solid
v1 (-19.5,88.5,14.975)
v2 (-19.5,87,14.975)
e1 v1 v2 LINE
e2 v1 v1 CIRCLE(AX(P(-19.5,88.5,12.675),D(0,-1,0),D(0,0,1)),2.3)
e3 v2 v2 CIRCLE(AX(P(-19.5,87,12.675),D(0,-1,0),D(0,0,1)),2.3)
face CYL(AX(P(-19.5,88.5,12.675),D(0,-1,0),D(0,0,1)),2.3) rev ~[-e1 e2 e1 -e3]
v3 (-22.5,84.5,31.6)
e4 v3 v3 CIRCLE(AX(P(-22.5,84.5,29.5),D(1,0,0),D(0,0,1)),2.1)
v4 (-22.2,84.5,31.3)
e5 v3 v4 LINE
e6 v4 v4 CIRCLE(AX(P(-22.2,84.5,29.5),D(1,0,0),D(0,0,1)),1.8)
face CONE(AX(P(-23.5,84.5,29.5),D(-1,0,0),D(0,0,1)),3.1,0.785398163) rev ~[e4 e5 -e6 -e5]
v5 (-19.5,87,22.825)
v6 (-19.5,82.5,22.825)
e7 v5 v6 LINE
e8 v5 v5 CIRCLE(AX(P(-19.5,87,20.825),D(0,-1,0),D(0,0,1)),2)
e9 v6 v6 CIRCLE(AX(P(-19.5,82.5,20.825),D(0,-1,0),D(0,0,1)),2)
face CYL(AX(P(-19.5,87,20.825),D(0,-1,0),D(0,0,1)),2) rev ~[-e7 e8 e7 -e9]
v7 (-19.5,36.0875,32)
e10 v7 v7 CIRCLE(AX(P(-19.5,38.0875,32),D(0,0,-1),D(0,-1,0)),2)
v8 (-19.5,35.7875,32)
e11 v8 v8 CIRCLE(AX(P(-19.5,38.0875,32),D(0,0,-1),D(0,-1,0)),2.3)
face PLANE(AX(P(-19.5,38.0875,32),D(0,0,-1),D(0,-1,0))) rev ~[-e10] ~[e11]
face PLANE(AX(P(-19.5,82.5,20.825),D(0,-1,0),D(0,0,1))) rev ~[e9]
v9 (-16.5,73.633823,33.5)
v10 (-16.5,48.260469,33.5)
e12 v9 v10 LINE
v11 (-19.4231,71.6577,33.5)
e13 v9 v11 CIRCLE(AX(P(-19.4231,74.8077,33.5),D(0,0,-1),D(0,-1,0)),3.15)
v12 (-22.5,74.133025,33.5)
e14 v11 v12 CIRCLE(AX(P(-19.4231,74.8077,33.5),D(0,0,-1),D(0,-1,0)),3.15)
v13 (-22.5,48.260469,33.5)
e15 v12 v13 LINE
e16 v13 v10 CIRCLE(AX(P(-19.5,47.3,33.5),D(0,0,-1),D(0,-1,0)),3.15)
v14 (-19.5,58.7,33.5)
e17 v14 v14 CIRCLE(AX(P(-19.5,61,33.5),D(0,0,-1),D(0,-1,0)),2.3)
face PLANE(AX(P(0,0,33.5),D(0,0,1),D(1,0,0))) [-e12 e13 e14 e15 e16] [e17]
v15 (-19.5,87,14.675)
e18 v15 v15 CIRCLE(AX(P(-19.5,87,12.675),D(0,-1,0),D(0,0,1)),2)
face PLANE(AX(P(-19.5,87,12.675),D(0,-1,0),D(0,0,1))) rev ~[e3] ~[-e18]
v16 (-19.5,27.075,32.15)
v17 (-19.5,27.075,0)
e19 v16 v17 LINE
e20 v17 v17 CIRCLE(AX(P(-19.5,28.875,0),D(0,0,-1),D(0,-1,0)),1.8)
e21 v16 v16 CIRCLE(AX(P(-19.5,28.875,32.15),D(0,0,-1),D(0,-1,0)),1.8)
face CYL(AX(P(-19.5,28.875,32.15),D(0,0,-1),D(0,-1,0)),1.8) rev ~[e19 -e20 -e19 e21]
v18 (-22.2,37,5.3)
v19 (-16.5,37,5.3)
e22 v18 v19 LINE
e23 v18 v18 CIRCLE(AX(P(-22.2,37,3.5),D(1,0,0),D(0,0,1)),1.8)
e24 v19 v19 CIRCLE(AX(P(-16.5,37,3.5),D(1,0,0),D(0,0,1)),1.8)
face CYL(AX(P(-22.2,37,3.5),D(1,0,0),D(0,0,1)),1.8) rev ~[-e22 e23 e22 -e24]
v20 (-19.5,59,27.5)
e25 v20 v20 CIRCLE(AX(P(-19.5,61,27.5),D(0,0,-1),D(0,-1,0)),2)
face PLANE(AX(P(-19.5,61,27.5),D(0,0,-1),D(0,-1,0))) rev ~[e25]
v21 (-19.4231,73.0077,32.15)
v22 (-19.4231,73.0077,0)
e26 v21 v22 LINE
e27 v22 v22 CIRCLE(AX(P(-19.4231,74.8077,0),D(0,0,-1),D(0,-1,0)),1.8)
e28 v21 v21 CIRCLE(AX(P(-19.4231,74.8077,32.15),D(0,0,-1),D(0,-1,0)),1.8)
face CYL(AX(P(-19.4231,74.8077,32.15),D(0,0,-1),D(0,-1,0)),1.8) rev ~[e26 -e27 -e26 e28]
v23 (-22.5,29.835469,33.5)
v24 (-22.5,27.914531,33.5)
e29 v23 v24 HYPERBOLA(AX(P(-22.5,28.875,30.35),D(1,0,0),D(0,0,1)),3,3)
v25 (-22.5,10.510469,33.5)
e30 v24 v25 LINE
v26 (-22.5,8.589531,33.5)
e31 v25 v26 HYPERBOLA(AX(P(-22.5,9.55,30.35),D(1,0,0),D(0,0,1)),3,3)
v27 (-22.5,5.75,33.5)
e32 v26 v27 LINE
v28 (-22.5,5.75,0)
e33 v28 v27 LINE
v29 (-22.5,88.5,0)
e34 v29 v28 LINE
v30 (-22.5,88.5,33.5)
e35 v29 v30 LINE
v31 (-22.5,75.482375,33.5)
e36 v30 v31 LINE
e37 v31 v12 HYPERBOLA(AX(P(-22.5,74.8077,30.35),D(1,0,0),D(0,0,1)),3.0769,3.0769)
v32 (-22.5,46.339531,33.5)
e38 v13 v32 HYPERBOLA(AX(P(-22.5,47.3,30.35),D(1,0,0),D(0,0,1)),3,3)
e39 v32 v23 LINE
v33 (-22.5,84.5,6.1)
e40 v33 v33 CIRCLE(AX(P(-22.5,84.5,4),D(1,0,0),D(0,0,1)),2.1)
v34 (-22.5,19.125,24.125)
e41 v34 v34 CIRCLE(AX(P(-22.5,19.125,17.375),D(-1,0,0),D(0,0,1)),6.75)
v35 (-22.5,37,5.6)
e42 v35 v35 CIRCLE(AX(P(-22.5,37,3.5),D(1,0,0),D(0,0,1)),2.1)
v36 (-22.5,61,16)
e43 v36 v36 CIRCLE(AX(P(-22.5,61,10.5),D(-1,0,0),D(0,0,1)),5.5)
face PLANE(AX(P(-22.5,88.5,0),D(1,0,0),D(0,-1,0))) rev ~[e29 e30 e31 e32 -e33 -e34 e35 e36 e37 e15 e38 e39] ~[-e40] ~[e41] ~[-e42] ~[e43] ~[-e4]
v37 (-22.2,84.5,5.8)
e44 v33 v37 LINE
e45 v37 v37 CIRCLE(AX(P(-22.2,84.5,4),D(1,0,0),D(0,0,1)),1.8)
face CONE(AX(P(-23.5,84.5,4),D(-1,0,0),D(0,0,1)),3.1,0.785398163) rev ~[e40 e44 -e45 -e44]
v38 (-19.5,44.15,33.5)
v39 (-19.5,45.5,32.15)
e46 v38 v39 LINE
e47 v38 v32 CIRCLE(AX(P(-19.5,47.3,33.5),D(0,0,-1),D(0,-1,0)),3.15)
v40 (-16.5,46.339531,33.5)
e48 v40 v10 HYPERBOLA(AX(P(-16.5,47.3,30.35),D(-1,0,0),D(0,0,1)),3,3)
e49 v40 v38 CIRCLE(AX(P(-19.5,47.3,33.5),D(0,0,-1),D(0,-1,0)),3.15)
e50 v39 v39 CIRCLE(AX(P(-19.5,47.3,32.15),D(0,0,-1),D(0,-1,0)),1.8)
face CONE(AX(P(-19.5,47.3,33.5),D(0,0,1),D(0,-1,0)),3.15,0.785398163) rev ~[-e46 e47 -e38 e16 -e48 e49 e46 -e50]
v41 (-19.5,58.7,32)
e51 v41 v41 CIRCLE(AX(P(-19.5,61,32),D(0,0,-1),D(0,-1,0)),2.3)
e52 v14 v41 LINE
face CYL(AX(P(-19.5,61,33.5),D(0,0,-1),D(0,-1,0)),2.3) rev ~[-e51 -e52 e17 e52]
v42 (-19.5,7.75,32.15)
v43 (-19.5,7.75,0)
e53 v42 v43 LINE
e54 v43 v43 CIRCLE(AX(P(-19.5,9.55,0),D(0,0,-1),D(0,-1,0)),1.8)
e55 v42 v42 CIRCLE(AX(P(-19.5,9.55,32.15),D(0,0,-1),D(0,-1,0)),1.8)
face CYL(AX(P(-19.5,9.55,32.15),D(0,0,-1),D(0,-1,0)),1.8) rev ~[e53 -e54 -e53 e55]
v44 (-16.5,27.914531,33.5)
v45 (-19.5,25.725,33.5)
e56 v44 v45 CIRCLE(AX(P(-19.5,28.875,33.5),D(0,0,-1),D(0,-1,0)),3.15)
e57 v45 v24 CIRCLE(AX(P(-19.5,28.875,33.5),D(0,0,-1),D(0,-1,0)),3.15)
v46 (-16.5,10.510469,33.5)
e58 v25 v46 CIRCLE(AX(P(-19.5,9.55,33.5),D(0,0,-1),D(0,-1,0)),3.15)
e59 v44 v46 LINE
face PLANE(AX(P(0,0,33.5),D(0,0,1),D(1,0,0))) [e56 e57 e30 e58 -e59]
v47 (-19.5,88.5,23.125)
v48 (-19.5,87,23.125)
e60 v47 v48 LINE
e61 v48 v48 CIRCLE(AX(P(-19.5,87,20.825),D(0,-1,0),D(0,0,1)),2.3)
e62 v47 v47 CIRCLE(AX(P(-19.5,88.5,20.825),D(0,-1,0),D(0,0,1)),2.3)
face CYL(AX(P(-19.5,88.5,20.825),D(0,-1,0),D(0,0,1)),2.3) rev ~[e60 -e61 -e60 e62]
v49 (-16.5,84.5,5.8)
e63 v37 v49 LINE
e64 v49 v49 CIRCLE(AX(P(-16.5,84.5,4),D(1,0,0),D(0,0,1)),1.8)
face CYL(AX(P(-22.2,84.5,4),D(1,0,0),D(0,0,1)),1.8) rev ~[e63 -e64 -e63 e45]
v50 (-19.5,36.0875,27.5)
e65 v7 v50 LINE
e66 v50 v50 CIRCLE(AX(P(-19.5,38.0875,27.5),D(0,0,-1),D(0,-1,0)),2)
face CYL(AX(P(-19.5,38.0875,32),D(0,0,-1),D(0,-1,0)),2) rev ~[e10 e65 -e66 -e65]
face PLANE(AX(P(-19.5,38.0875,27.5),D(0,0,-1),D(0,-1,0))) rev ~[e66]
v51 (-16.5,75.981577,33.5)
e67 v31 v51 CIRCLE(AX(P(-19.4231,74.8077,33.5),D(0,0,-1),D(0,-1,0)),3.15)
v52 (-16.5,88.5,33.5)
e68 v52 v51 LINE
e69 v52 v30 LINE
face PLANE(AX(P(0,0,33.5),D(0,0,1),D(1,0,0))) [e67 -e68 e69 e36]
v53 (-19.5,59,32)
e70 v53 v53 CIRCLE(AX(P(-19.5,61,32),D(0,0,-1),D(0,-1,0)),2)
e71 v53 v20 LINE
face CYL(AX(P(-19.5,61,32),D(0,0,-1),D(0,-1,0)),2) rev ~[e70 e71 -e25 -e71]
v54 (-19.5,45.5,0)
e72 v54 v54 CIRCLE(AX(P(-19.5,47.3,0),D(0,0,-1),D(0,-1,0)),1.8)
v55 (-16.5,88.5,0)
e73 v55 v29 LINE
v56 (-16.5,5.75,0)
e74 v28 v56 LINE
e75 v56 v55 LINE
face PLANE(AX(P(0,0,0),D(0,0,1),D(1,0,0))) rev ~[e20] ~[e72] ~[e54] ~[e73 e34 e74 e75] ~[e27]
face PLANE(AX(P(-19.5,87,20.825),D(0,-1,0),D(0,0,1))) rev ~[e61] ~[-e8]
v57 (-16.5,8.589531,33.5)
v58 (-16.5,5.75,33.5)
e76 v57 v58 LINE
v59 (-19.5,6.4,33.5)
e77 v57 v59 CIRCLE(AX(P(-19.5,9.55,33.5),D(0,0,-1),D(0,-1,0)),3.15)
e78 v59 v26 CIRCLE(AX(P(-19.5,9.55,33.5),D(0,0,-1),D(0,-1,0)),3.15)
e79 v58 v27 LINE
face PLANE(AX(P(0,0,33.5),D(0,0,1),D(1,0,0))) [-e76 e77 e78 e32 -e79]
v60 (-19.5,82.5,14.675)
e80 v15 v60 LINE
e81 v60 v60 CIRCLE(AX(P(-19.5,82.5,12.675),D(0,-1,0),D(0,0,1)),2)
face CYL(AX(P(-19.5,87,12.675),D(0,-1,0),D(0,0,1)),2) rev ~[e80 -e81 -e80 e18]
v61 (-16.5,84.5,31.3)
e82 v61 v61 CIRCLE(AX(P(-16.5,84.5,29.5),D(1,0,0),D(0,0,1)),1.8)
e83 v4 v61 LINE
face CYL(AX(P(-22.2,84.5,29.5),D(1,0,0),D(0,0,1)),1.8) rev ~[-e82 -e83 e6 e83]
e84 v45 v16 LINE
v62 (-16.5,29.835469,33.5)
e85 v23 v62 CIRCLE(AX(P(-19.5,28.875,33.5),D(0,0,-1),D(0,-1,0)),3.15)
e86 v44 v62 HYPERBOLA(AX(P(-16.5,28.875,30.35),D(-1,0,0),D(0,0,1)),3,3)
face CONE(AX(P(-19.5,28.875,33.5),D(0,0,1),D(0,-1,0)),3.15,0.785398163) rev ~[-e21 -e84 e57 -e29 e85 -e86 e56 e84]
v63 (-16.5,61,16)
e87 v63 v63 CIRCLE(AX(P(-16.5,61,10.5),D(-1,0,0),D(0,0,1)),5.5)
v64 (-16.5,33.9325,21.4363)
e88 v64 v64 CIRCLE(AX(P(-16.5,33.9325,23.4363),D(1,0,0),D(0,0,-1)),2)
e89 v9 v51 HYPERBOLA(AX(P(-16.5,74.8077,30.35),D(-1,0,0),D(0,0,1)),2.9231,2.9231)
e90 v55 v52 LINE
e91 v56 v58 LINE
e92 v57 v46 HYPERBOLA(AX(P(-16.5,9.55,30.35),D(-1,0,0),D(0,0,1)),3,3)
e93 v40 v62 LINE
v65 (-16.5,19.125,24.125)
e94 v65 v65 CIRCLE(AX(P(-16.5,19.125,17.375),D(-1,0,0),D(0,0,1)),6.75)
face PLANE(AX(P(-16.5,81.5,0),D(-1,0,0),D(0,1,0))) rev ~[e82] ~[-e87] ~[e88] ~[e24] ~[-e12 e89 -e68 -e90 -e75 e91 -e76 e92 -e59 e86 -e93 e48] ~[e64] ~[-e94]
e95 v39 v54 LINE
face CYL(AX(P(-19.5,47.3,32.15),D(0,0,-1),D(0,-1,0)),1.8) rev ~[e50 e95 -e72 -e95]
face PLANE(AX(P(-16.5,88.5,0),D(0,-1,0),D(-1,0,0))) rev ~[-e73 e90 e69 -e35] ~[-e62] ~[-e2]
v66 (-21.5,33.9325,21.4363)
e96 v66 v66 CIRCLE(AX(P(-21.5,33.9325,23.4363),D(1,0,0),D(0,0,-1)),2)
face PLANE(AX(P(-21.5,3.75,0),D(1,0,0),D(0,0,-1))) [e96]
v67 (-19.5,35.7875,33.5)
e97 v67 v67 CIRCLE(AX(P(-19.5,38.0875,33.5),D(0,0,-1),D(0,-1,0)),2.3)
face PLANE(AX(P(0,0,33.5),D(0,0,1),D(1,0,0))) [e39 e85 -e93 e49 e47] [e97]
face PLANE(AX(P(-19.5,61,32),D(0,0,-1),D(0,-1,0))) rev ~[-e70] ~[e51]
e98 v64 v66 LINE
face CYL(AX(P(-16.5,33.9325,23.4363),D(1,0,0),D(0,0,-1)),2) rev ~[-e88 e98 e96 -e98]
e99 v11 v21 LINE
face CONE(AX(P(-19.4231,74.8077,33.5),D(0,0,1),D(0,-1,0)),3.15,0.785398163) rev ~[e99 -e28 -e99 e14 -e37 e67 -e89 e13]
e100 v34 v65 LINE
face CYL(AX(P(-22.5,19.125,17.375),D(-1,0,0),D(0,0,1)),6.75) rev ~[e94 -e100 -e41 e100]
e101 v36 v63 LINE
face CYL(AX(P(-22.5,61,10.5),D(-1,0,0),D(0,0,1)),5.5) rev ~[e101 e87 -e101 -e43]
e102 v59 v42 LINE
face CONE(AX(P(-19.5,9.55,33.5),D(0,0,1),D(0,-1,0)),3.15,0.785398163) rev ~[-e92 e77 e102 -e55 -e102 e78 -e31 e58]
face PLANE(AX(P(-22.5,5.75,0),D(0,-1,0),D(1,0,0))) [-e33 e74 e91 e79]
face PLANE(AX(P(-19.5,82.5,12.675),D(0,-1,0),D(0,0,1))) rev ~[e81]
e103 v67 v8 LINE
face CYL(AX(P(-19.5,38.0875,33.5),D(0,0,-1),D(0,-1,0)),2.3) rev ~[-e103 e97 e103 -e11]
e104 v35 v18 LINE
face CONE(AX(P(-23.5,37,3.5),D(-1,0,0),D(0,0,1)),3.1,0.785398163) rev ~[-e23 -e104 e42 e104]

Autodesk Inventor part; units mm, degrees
ref_plane "YZ Plane" through (0, 0, 0) normal (1, 0, 0) x (0, 1, 0)
ref_plane "XZ Plane" through (0, 0, 0) normal (0, 1, 0) x (-1, 0, 0)
ref_plane "Work Plane1" through (0, 0, 0) normal (0, 0, 1) x (1, 0, 0)
sketch "Sketch1" plane through (0, 0, 0) normal (0, 0, 1) x (1, 0, 0)
  line L0 (23.5, 88.5) -> (-23.5, 88.5) projected
  line L1 (-23.5, 88.5) -> (-23.5, 36.5) projected
  line L2 (-26.5, 33.5) -> (-89, 33.5) projected
  line L3 (-89, 33.5) -> (-89, -72.5) projected
  line L4 (-89, -72.5) -> (-77, -72.5) projected
  line L5 (-74, -75.5) -> (-74, -93.5) projected
  line L6 (-74, -93.5) -> (74, -93.5) projected
  line L7 (74, -93.5) -> (74, -75.5) projected
  line L8 (77, -72.5) -> (89, -72.5) projected
  line L9 (89, -72.5) -> (89, 33.5) projected
  line L10 (89, 33.5) -> (26.5, 33.5) projected
  line L11 (23.5, 36.5) -> (23.5, 88.5) projected
  line L12 (-4.5, 81.5) -> (-4.5, 36.5) projected
  line L13 (-7.5, 33.5) -> (-13.5, 33.5) projected
  line L14 (-16.5, 36.5) -> (-16.5, 81.5) projected
  line L15 (7.5, 84.5) -> (13.5, 84.5) projected
  line L16 (16.5, 81.5) -> (16.5, 36.5) projected
  line L17 (13.5, 33.5) -> (7.5, 33.5) projected
  line L18 (4.5, 36.5) -> (4.5, 81.5) projected
  line L19 (-13.5, 84.5) -> (-7.5, 84.5) projected
  line L20 (-16.5, 88.5) -> (-22.5, 88.5)
  line L21 (-22.5, 88.5) -> (-22.5, 3.75)
  line L22 (-22.5, 3.75) -> (-16.5, 3.75)
  line L23 (-16.5, 3.75) -> (-16.5, 88.5)
  line L24 (-32.2, 4.75) -> (-59.9, 4.75)
  arc A0 (13.5, 33.5) -> (16.5, 36.5) centre (13.5, 36.5) ccw projected
  arc A1 (4.5, 36.5) -> (7.5, 33.5) centre (7.5, 36.5) ccw projected
  arc A2 (7.5, 84.5) -> (4.5, 81.5) centre (7.5, 81.5) ccw projected
  arc A3 (16.5, 81.5) -> (13.5, 84.5) centre (13.5, 81.5) ccw projected
  arc A4 (-4.5, 81.5) -> (-7.5, 84.5) centre (-7.5, 81.5) ccw projected
  arc A5 (-7.5, 33.5) -> (-4.5, 36.5) centre (-7.5, 36.5) ccw projected
  arc A6 (-16.5, 36.5) -> (-13.5, 33.5) centre (-13.5, 36.5) ccw projected
  arc A7 (-13.5, 84.5) -> (-16.5, 81.5) centre (-13.5, 81.5) ccw projected
  arc A8 (-26.5, 33.5) -> (-23.5, 36.5) centre (-26.5, 36.5) ccw projected
  arc A9 (-74, -75.5) -> (-77, -72.5) centre (-77, -75.5) ccw projected
  arc A10 (77, -72.5) -> (74, -75.5) centre (77, -75.5) ccw projected
  arc A11 (23.5, 36.5) -> (26.5, 33.5) centre (26.5, 36.5) ccw projected
  circle A12 centre (39.125, 25.9125) radius 1.0065 projected
  circle A13 centre (72.95, 12.275) radius 1.0065 projected
  circle A14 centre (86, 30.5) radius 1.0065 projected
  circle A15 centre (-86, 30.5) radius 1.0065 projected
  circle A16 centre (-39.125, 12.3375) radius 1.0065 projected
  circle A17 centre (-72.95, 25.975) radius 1.0065 projected
  circle A18 centre (-72.95, 12.275) radius 1.0065 projected
  circle A19 centre (-39.125, 25.9125) radius 1.0065 projected
  circle A20 centre (-86, 7.75) radius 1.0065 projected
  circle A21 centre (86, 7.75) radius 1.0065 projected
  circle A22 centre (72.95, 25.975) radius 1.0065 projected
  circle A23 centre (39.125, 12.3375) radius 1.0065 projected
  circle A24 centre (-24.1, -73.1) radius 1.2295 projected
  circle A25 centre (-42.4984, -44.6666) radius 1.2295 projected
  circle A26 centre (-79, -42.3889) radius 1.2295 projected
  circle A27 centre (-19.5, 28.875) radius 1.2295 projected
  circle A28 centre (19.5, 9.55) radius 1.2295 projected
  circle A29 centre (19.5, 47.3) radius 1.2295 projected
  circle A30 centre (-19.5, 47.3) radius 1.2295 projected
  circle A31 centre (0, 74.7) radius 1.2295 projected
  circle A32 centre (-19.4231, 74.8077) radius 1.2295 projected
  circle A33 centre (19.5, 74.7) radius 1.2295 projected
  circle A34 centre (0, 49.05) radius 1.2295 projected
  circle A35 centre (19.5, 28.875) radius 1.2295 projected
  circle A36 centre (0, 19.125) radius 1.2295 projected
  circle A37 centre (-19.5, 9.55) radius 1.2295 projected
  circle A38 centre (24.1, -73.1) radius 1.2295 projected
  circle A39 centre (42.5, -44.6649) radius 1.2295 projected
  circle A40 centre (79, -42.3889) radius 1.2295 projected
  circle A41 centre (21.5, -85.5) radius 1.8 projected
  circle A42 centre (-64.5, -85.5) radius 1.8 projected
  circle A43 centre (-83.4, -19.2889) radius 1.8 projected
  circle A44 centre (-21.5, -85.5) radius 1.8 projected
  circle A45 centre (64.5, -85.5) radius 1.8 projected
  line L25 (-58.2315, -77.6013) -> (-77.7685, -63.3434) projected
  line L26 (-79, -36.3889) -> (-79, 1.75) projected
  line L27 (-75.7766, -45.4056) -> (-47.1423, -47.5438) projected
  line L28 (-21.1, -26.5751) -> (-21.1, -22.0255) projected
  line L29 (-46.9357, -41.5592) -> (-76, -39.3889) projected
  line L30 (-79, -60.9201) -> (-79, -48.3972) projected
  line L31 (32.0924, 4.75) -> (76, 4.75) projected
  line L32 (79, 1.75) -> (79, -36.3889) projected
  line L33 (76, -39.3889) -> (46.9371, -41.5577) projected
  line L34 (21.1, -22.0255) -> (21.1, -26.5749) projected
  line L35 (47.144, -47.5423) -> (76, -45.3889) projected
  line L36 (79, -48.3889) -> (79, -60.9201) projected
  line L37 (77.7685, -63.3434) -> (58.2315, -77.6013) projected
  line L38 (57, -80.0246) -> (57, -87.5) projected
  arc A46 (55, -89.5) -> (57, -87.5) centre (55, -87.5) ccw projected
  line L39 (55, -89.5) -> (31, -89.5) projected
  arc A47 (29, -87.5) -> (31, -89.5) centre (31, -87.5) ccw projected
  line L40 (29, -87.5) -> (29, -79.2522) projected
  line L41 (14, -79.5039) -> (14, -87.5) projected
  arc A48 (12, -89.5) -> (14, -87.5) centre (12, -87.5) ccw projected
  line L42 (12, -89.5) -> (-12, -89.5) projected
  arc A49 (-14, -87.5) -> (-12, -89.5) centre (-12, -87.5) ccw projected
  line L43 (-14, -87.5) -> (-14, -79.5039) projected
  line L44 (-29, -79.2522) -> (-29, -87.5) projected
  arc A50 (-31, -89.5) -> (-29, -87.5) centre (-31, -87.5) ccw projected
  line L45 (-31, -89.5) -> (-55, -89.5) projected
  arc A51 (-57, -87.5) -> (-55, -89.5) centre (-55, -87.5) ccw projected
  line L46 (-57, -87.5) -> (-57, -80.0246) projected
  line L47 (-66.95, 28.9125) -> (-45.125, 28.9125) projected
  line L48 (-42.125, 25.9125) -> (-42.125, 12.275) projected
  line L49 (-45.125, 9.275) -> (-66.95, 9.275) projected
  line L50 (-69.95, 12.275) -> (-69.95, 25.9125) projected
  line L51 (-16.5, 12.75) -> (-16.5, 25.5) projected
  line L52 (-13.5, 28.5) -> (-7.5, 28.5) projected
  line L53 (-4.5, 25.5) -> (-4.5, 12.75) projected
  line L54 (-7.5, 9.75) -> (-13.5, 9.75) projected
  line L55 (66.95, 9.3375) -> (45.125, 9.3375) projected
  line L56 (42.125, 12.3375) -> (42.125, 25.975) projected
  line L57 (45.125, 28.975) -> (66.95, 28.975) projected
  line L58 (69.95, 25.975) -> (69.95, 12.3375) projected
  line L59 (4.5, 12.75) -> (4.5, 25.5) projected
  line L60 (7.5, 28.5) -> (13.5, 28.5) projected
  line L61 (16.5, 25.5) -> (16.5, 12.75) projected
  line L62 (13.5, 9.75) -> (7.5, 9.75) projected
  line L63 (44.5181, -40.6102) -> (28.0046, -22.8717) projected
  line L64 (27.2109, -20.577) -> (29.1029, 2.0005) projected
  line L65 (-44.7206, -49.1201) -> (-29.3549, -77.8368) projected
  line L66 (-76, 4.75) -> (-32.0924, 4.75) projected
  line L67 (-29.1029, 2.0005) -> (-27.2109, -20.5772) projected
  line L68 (-28.0044, -22.8717) -> (-44.5164, -40.6115) projected
  line L69 (29.3549, -77.8368) -> (44.7222, -49.1185) projected
  line L70 (-14.6042, -77.6983) -> (-37.8537, -46.8489) projected
  line L71 (-37.4786, -42.8259) -> (-22.0793, -28.7924) projected
  line L72 (-21.1105, -21.775) -> (-23.0609, 1.4995) projected
  line L73 (-20.0714, 4.75) -> (20.0714, 4.75) projected
  line L74 (23.0609, 1.4995) -> (21.1105, -21.775) projected
  line L75 (22.0795, -28.7925) -> (37.4798, -42.8243) projected
  line L76 (37.8551, -46.8475) -> (14.6042, -77.6983) projected
  circle A52 centre (-78, -67.1725) radius 1.2295 projected
  arc A53 (76, -39.3889) -> (79, -36.3889) centre (76, -36.3889) ccw projected
  arc A54 (44.5181, -40.6102) -> (46.9371, -41.5577) centre (46.7138, -38.566) ccw projected
  arc A55 (27.2109, -20.577) -> (28.0046, -22.8717) centre (30.2004, -20.8276) ccw projected
  arc A56 (32.0924, 4.75) -> (29.1029, 2.0005) centre (32.0924, 1.75) ccw projected
  arc A57 (79, 1.75) -> (76, 4.75) centre (76, 1.75) ccw projected
  arc A58 (-42.125, 25.9125) -> (-45.125, 28.9125) centre (-45.125, 25.9125) ccw projected
  arc A59 (-45.125, 9.275) -> (-42.125, 12.275) centre (-45.125, 12.275) ccw projected
  arc A60 (-69.95, 12.275) -> (-66.95, 9.275) centre (-66.95, 12.275) ccw projected
  arc A61 (-66.95, 28.9125) -> (-69.95, 25.9125) centre (-66.95, 25.9125) ccw projected
  arc A62 (-13.5, 28.5) -> (-16.5, 25.5) centre (-13.5, 25.5) ccw projected
  arc A63 (-4.5, 25.5) -> (-7.5, 28.5) centre (-7.5, 25.5) ccw projected
  arc A64 (-7.5, 9.75) -> (-4.5, 12.75) centre (-7.5, 12.75) ccw projected
  arc A65 (-16.5, 12.75) -> (-13.5, 9.75) centre (-13.5, 12.75) ccw projected
  arc A66 (58.2315, -77.6013) -> (57, -80.0246) centre (60, -80.0246) ccw projected
  arc A67 (29.3549, -77.8368) -> (29, -79.2522) centre (32, -79.2522) ccw projected
  arc A68 (47.144, -47.5423) -> (44.7222, -49.1185) centre (47.3673, -50.5339) ccw projected
  arc A69 (79, -48.3889) -> (76, -45.3889) centre (76, -48.3889) ccw projected
  arc A70 (77.7685, -63.3434) -> (79, -60.9201) centre (76, -60.9201) ccw projected
  arc A71 (-21.1, -22.0255) -> (-21.1105, -21.775) centre (-24.1, -22.0255) ccw projected
  arc A72 (-20.0714, 4.75) -> (-23.0609, 1.4995) centre (-20.0714, 1.75) ccw projected
  arc A73 (23.0609, 1.4995) -> (20.0714, 4.75) centre (20.0714, 1.75) ccw projected
  arc A74 (21.1105, -21.775) -> (21.1, -22.0255) centre (24.1, -22.0255) ccw projected
  arc A75 (21.1, -26.5749) -> (22.0795, -28.7925) centre (24.1, -26.5749) ccw projected
  arc A76 (37.8551, -46.8475) -> (37.4798, -42.8243) centre (35.4593, -45.0419) ccw projected
  arc A77 (14.6042, -77.6983) -> (14, -79.5039) centre (17, -79.5039) ccw projected
  arc A78 (-14, -79.5039) -> (-14.6042, -77.6983) centre (-17, -79.5039) ccw projected
  arc A79 (-37.4786, -42.8259) -> (-37.8537, -46.8489) centre (-35.4579, -45.0433) ccw projected
  arc A80 (-22.0793, -28.7924) -> (-21.1, -26.5751) centre (-24.1, -26.5751) ccw projected
  arc A81 (-79, -36.3889) -> (-76, -39.3889) centre (-76, -36.3889) ccw projected
  arc A82 (-76, 4.75) -> (-79, 1.75) centre (-76, 1.75) ccw projected
  arc A83 (-29.1029, 2.0005) -> (-32.0924, 4.75) centre (-32.0924, 1.75) ccw projected
  arc A84 (-28.0044, -22.8717) -> (-27.2109, -20.5772) centre (-30.2004, -20.8277) ccw projected
  arc A85 (-46.9357, -41.5592) -> (-44.5164, -40.6115) centre (-46.7123, -38.5676) ccw projected
  arc A86 (7.5, 28.5) -> (4.5, 25.5) centre (7.5, 25.5) ccw projected
  arc A87 (16.5, 25.5) -> (13.5, 28.5) centre (13.5, 25.5) ccw projected
  arc A88 (13.5, 9.75) -> (16.5, 12.75) centre (13.5, 12.75) ccw projected
  arc A89 (4.5, 12.75) -> (7.5, 9.75) centre (7.5, 12.75) ccw projected
  arc A90 (-57, -80.0246) -> (-58.2315, -77.6013) centre (-60, -80.0246) ccw projected
  arc A91 (-79, -60.9201) -> (-77.7685, -63.3434) centre (-76, -60.9201) ccw projected
  arc A92 (-75.7766, -45.4056) -> (-79, -48.3972) centre (-76, -48.3972) ccw projected
  arc A93 (-44.7206, -49.1201) -> (-47.1423, -47.5438) centre (-47.3657, -50.5355) ccw projected
  arc A94 (-29, -79.2522) -> (-29.3549, -77.8368) centre (-32, -79.2522) ccw projected
  arc A95 (42.125, 12.3375) -> (45.125, 9.3375) centre (45.125, 12.3375) ccw projected
  arc A96 (45.125, 28.975) -> (42.125, 25.975) centre (45.125, 25.975) ccw projected
  arc A97 (69.95, 25.975) -> (66.95, 28.975) centre (66.95, 25.975) ccw projected
  arc A98 (66.95, 9.3375) -> (69.95, 12.3375) centre (66.95, 12.3375) ccw projected
  circle A99 centre (78, -67.1725) radius 1.2295 projected
  circle A100 centre (83.4, -16.3889) radius 1.8 projected
  circle A101 centre (24.1, -24.9) radius 1.2295 projected
  circle A102 centre (-24.1, -24.9) radius 1.2295 projected
  point P0 (0, 0)
  point P1 (-16.5, 36.5)
  point P2 (-16.5, 81.5)
  point P3 (7.5, 81.5)
  point P4 (13.5, 81.5)
  point P5 (-7.5, 81.5)
  point P6 (-13.5, 81.5)
  point P7 (39, -44.2094)
  point P8 (-16.5, 9.75)
  point P9 (-16.5, 28.5)
  point P10 (-79, -67.8878)
  point P11 (-79, -66.4572)
  dimension "d0" = 1
  dimension "d2" = 1
ref_plane "Work Plane2" through (-89, -40.3889, 33.5) normal (0, 0, 1) x (1, 0, 0)
extrude "Extrusion1" add sketch "Sketch1" along normal up to surface (33.5 mm away) contours L23 L14 L73 A72 L22 L21 L0 | A72 L73 L23 L22 | A27 | A30 | A32 | A37
sketch "Sketch2" plane through (-22.5, 3.75, 0) normal (-1, 0, 0) x (0, 0, 1)
  arc A0 (15.7043, 9.7757) -> (16.863, 11.545) centre (12.3771, 13.2188) ccw projected
  arc A1 (16.863, 11.545) -> (17.4685, 11.512) centre (17.375, 15.375) ccw projected
  arc A2 (17.4685, 11.512) -> (18.4285, 9.6275) centre (22.1095, 12.6893) ccw projected
  arc A3 (18.4285, 9.6275) -> (19.3146, 9.863) centre (17.375, 15.375) ccw projected
  arc A4 (19.3146, 9.863) -> (19.2121, 11.9755) centre (14.599, 10.6929) ccw projected
  arc A5 (19.2121, 11.9755) -> (19.7212, 12.3047) centre (17.375, 15.375) ccw projected
  arc A6 (19.7212, 12.3047) -> (21.6056, 11.3444) centre (22.7839, 15.9851) ccw projected
  arc A7 (21.6056, 11.3444) -> (22.184, 12.0558) centre (17.375, 15.375) ccw projected
  arc A8 (22.184, 12.0558) -> (20.8594, 13.7045) centre (17.8813, 9.9554) ccw projected
  arc A9 (20.8594, 13.7045) -> (21.0778, 14.2702) centre (17.375, 15.375) ccw projected
  arc A10 (21.0778, 14.2702) -> (23.1668, 14.6008) centre (21.3923, 19.0479) ccw projected
  arc A11 (23.1668, 14.6008) -> (23.2166, 15.5164) centre (17.375, 15.375) ccw projected
  arc A12 (23.2166, 15.5164) -> (21.1758, 16.0716) centre (20.9701, 11.288) ccw projected
  arc A13 (21.1758, 16.0716) -> (21.02, 16.6576) centre (17.375, 15.375) ccw projected
  arc A14 (21.02, 16.6576) -> (22.5157, 18.153) centre (18.4662, 20.7077) ccw projected
  arc A15 (22.5157, 18.153) -> (22.0178, 18.923) centre (17.375, 15.375) ccw projected
  arc A16 (22.0178, 18.923) -> (20.0404, 18.1726) centre (22.6858, 14.1817) ccw projected
  arc A17 (20.0404, 18.1726) -> (19.57, 18.5552) centre (17.375, 15.375) ccw projected
  arc A18 (19.57, 18.5552) -> (19.9011, 20.644) centre (15.1233, 20.3306) ccw projected
  arc A19 (19.9011, 20.644) -> (19.0457, 20.9743) centre (17.375, 15.375) ccw projected
  arc A20 (19.0457, 20.9743) -> (17.887, 19.205) centre (22.3729, 17.5312) ccw projected
  arc A21 (17.887, 19.205) -> (17.2815, 19.238) centre (17.375, 15.375) ccw projected
  arc A22 (17.2815, 19.238) -> (16.3215, 21.1225) centre (12.6405, 18.0607) ccw projected
  arc A23 (16.3215, 21.1225) -> (15.4354, 20.887) centre (17.375, 15.375) ccw projected
  arc A24 (15.4354, 20.887) -> (15.5379, 18.7745) centre (20.151, 20.0571) ccw projected
  arc A25 (15.5379, 18.7745) -> (15.0288, 18.4453) centre (17.375, 15.375) ccw projected
  arc A26 (15.0288, 18.4453) -> (13.1444, 19.4056) centre (11.9661, 14.7649) ccw projected
  arc A27 (13.1444, 19.4056) -> (12.566, 18.6942) centre (17.375, 15.375) ccw projected
  arc A28 (12.566, 18.6942) -> (13.8906, 17.0455) centre (16.8687, 20.7946) ccw projected
  arc A29 (13.8906, 17.0455) -> (13.6722, 16.4798) centre (17.375, 15.375) ccw projected
  arc A30 (13.6722, 16.4798) -> (11.5832, 16.1492) centre (13.3577, 11.7021) ccw projected
  arc A31 (11.5832, 16.1492) -> (11.5334, 15.2336) centre (17.375, 15.375) ccw projected
  arc A32 (11.5334, 15.2336) -> (13.5742, 14.6784) centre (13.7799, 19.462) ccw projected
  arc A33 (13.5742, 14.6784) -> (13.73, 14.0924) centre (17.375, 15.375) ccw projected
  arc A34 (13.73, 14.0924) -> (12.2343, 12.597) centre (16.2838, 10.0423) ccw projected
  arc A35 (12.2343, 12.597) -> (12.7322, 11.827) centre (17.375, 15.375) ccw projected
  arc A36 (12.7322, 11.827) -> (14.7096, 12.5774) centre (12.0642, 16.5683) ccw projected
  arc A37 (14.7096, 12.5774) -> (15.18, 12.1948) centre (17.375, 15.375) ccw projected
  arc A38 (15.18, 12.1948) -> (14.8489, 10.106) centre (19.6267, 10.4194) ccw projected
  arc A39 (14.8489, 10.106) -> (15.7043, 9.7757) centre (17.375, 15.375) ccw projected
  circle A40 centre (17.375, 15.375) radius 6.75
  circle A41 centre (17.375, 15.375) radius 5.8433
  line L0 (23.2183, 15.375) -> (24.125, 15.375)
  circle A42 centre (10.5, 57.25) radius 5.5 projected
  point P0 (0, -3.75)
  dimension "d6" = 13.5
  dimension "d5" = 0.9067
  dimension "d9" = 11
extrude "Extrusion2" cut sketch "Sketch2" against normal up to next contours A39 A38 A37 A36 A35 A34 A33 A32 A31 A30 A29 A28 A27 A26 A25 A24 A23 A22 A21 A20 A19 A18 A17 A16 A15 A14 A13 A12 A11 A10 A9 A8 A7 A6 A5 A4 A3 A2 A1 A0 | A0 A1 A2 A41 | A41 A36 A37 A38 | A4 A5 A6 A41 | A41 A32 A33 A34 | A8 A9 A10 A41 | A41 A28 A29 A30 | A41 A24 A25 A26 | A12 A13 A14 A41 | A41 A20 A21 A22 | A16 A17 A18 A41 | A40 | A42
sketch "Sketch3" plane through (-16.5, 3.75, 0) normal (1, 0, 0) x (0, 0, -1)
  circle A0 centre (-23.4363, 30.1825) radius 2 projected
  point P0 (0, -3.75)
extrude "Extrusion3" cut sketch "Sketch3" against normal blind 5
ref_plane "Work Plane3" through (-23.5, 3.75, 0) normal (-1, 0, 0) x (0, 0, 1)
sketch "Sketch5" plane through (-23.5, 3.75, 0) normal (-1, 0, 0) x (0, 0, 1)
  circle A0 centre (29.5, 80.75) radius 2.1 projected
  circle A1 centre (4, 80.75) radius 2.1 projected
  circle A2 centre (3.5, 33.25) radius 2.1 projected
  point P0 (0, -3.75)
hole "Hole1" at (-23.5, 84.5, 29.5) at (-23.5, 84.5, 4) at (-23.5, 37, 3.5) direction (1, 0, 0) diameter 3.6 end through all countersink diameter 6.2 countersink angle 90 clearance for "Countersunk Flat Head Screw ISO 2009/7046" size "M3" standard "ISO"
sketch "Sketch6" plane through (-22.5, 3.75, 33.5) normal (0, 0, 1) x (1, 0, 0)
  line L0 (0, 8.625) -> (0, 22.125) projected
  line L1 (1, 32.1825) -> (1, 28.1825) projected
  line L2 (0, 31.15) -> (0, 35.35) projected
  line L3 (0, 51.75) -> (0, 62.75) projected
  line L4 (0, 78.65) -> (0, 82.85) projected
  line L5 (0, 78.65) -> (0, 82.85) projected
  line L6 (6, 0) -> (0, 0) projected
  line L7 (6, 84.75) -> (6, 0) projected
  line L8 (0, 84.75) -> (6, 84.75) projected
  line L9 (0, 0) -> (0, 84.75) projected
  line L10 (6, 28.125) -> (0, 28.125)
  line L11 (0, 28.125) -> (0, 35.35)
  line L12 (0, 35.35) -> (6, 35.35)
  line L13 (6, 35.35) -> (6, 28.125)
  line L14 (0, 8.625) -> (6, 8.625) projected
  line L15 (6, 8.625) -> (0, 8.625)
  line L16 (0, 8.625) -> (0, 22.125)
  line L17 (0, 22.125) -> (6, 22.125)
  line L18 (6, 22.125) -> (6, 8.625)
  line L19 (6, 78.95) -> (0.3, 78.95) projected
  line L20 (6, 84.75) -> (0, 84.75) projected
  line L21 (6, 78.95) -> (0, 78.95)
  line L22 (0, 78.95) -> (0, 84.75)
  line L23 (0, 84.75) -> (6, 84.75)
  line L24 (6, 84.75) -> (6, 78.95)
  line L25 (0, 51.75) -> (6, 51.75) projected
  line L26 (0, 51.75) -> (0, 62.75) projected
  line L27 (6, 51.75) -> (0, 51.75)
  line L28 (0, 51.75) -> (0, 62.75)
  line L29 (0, 62.75) -> (6, 62.75)
  line L30 (6, 62.75) -> (6, 51.75)
  line L31 (6, 0) -> (0, 0)
  line L32 (0, 0) -> (0, 4)
  line L33 (0, 4) -> (6, 4)
  line L34 (6, 4) -> (6, 0)
  circle A0 centre (3, 5.8) radius 1.8
  line L35 (6, 22.125) -> (0, 28.125)
  line L36 (0, 22.125) -> (6, 28.125)
  line L37 (6, 35.35) -> (0, 51.75)
  line L38 (0, 35.35) -> (6, 51.75)
  line L39 (0.3, 82.55) -> (0.3, 78.95) projected
  line L40 (6, 62.75) -> (0.3, 78.95)
  line L41 (6, 82.55) -> (6, 78.95) projected
  line L42 (0.3, 78.95) -> (6, 78.95)
  line L43 (6, 78.95) -> (0, 62.75)
  point P0 (22.5, -3.75)
  point P1 (3, 25.125)
  point P2 (3.0769, 71.0577)
  point P3 (3, 43.55)
  dimension "d20" = 4
  dimension "d21" = 3.6
  dimension "d22" = 3
  dimension "d23" = 3
hole "Hole2" at (-19.5, 28.875, 33.5) at (-19.5, 9.55, 33.5) at (-19.4231, 74.8077, 33.5) at (-19.5, 47.3, 33.5) direction (0, 0, -1) diameter 3.6 end through all countersink diameter 6.3 countersink angle 90 clearance for "Countersunk Flat Head Screw ISO 2009/7046" size "M3" standard "ISO"
sketch "Sketch9" plane through (-22.5, 88.5, 0) normal (0, 1, 0) x (1, 0, 0)
  circle A0 centre (22.5, -20.825) radius 2.3 projected
  circle A1 centre (22.5, -12.675) radius 2.3 projected
  line L0 (18, -33.5) -> (27, -33.5) projected
  line L1 (27, 0) -> (27, -33.5) projected
  line L2 (27, 0) -> (18, 0) projected
  line L3 (18, 0) -> (18, -33.5) projected
  line L4 (22.5, -20.825) -> (0, -20.825)
  line L5 (0, -24.125) -> (0, -10.625) projected
  line L6 (22.5, -12.675) -> (0, -12.675)
  line L7 (6, 0) -> (6, -33.5) projected
  point P0 (22.5, 0)
  point P1 (3, -20.825)
  point P2 (3, -12.675)
  dimension "d45" = 3
  dimension "d46" = 3
  dimension "d47" = 3
  dimension "d48" = 3
hole "Hole5" at (-19.5, 88.5, 20.825) at (-19.5, 88.5, 12.675) direction (0, -1, 0) diameter 4 depth 6 counterbore diameter 4.6 counterbore depth 1.5
sketch "Sketch10" plane through (-19.5, 47.3, 33.5) normal (0, 0, 1) x (1, 0, 0)
  line L0 (-3, 8.2) -> (-3, 19.2) projected
  arc A0 (3, -17.4645) -> (-3, -17.4645) centre (0, -18.425) ccw projected
  arc A1 (-3, -0.9605) -> (3, -0.9605) centre (0, 0) ccw projected
  arc A2 (3, -17.4645) -> (-3, -17.4645) centre (0, -18.425) ccw projected
  line L1 (3, -0.9605) -> (3, -17.4645) projected
  arc A3 (-3, -0.9605) -> (3, -0.9605) centre (0, 0) ccw projected
  line L2 (-3, -17.4645) -> (-3, -0.9605) projected
  line L3 (3, 8.2) -> (-3, 8.2)
  line L4 (3, 19.2) -> (-3, 19.2)
  line L5 (-3, 19.2) -> (3, 8.2)
  line L6 (-3, 8.2) -> (3, 19.2)
  line L7 (3, -17.4645) -> (-3, -0.9605)
  line L8 (-3, -17.4645) -> (3, -0.9605)
  point P0 (19.5, -47.3)
  point P1 (0, -9.2125)
  point P2 (0, 13.7)
hole "Hole6" at (-19.5, 38.0875, 33.5) at (-19.5, 61, 33.5) direction (0, 0, -1) diameter 4 depth 6 counterbore diameter 4.6 counterbore depth 1.5
sketch "Sketch11" plane through (-22.5, 3.75, 0) normal (0, -1, 0) x (1, 0, 0)
  line L0 (6, 33.5) -> (0, 33.5) projected
  line L1 (0, 0) -> (0, 33.5) projected
  line L2 (0, 0) -> (6, 0) projected
  line L3 (6, 0) -> (6, 33.5) projected
  point P0 (22.5, 0)
extrude "Extrusion4" cut sketch "Sketch11" against normal blind 2
equation "\"d22\" = d23"
equation "\"d45\" = d46"
equation "\"d47\" = d48"
properties part number "right_gear_holder" material "Nylon 6/6"
